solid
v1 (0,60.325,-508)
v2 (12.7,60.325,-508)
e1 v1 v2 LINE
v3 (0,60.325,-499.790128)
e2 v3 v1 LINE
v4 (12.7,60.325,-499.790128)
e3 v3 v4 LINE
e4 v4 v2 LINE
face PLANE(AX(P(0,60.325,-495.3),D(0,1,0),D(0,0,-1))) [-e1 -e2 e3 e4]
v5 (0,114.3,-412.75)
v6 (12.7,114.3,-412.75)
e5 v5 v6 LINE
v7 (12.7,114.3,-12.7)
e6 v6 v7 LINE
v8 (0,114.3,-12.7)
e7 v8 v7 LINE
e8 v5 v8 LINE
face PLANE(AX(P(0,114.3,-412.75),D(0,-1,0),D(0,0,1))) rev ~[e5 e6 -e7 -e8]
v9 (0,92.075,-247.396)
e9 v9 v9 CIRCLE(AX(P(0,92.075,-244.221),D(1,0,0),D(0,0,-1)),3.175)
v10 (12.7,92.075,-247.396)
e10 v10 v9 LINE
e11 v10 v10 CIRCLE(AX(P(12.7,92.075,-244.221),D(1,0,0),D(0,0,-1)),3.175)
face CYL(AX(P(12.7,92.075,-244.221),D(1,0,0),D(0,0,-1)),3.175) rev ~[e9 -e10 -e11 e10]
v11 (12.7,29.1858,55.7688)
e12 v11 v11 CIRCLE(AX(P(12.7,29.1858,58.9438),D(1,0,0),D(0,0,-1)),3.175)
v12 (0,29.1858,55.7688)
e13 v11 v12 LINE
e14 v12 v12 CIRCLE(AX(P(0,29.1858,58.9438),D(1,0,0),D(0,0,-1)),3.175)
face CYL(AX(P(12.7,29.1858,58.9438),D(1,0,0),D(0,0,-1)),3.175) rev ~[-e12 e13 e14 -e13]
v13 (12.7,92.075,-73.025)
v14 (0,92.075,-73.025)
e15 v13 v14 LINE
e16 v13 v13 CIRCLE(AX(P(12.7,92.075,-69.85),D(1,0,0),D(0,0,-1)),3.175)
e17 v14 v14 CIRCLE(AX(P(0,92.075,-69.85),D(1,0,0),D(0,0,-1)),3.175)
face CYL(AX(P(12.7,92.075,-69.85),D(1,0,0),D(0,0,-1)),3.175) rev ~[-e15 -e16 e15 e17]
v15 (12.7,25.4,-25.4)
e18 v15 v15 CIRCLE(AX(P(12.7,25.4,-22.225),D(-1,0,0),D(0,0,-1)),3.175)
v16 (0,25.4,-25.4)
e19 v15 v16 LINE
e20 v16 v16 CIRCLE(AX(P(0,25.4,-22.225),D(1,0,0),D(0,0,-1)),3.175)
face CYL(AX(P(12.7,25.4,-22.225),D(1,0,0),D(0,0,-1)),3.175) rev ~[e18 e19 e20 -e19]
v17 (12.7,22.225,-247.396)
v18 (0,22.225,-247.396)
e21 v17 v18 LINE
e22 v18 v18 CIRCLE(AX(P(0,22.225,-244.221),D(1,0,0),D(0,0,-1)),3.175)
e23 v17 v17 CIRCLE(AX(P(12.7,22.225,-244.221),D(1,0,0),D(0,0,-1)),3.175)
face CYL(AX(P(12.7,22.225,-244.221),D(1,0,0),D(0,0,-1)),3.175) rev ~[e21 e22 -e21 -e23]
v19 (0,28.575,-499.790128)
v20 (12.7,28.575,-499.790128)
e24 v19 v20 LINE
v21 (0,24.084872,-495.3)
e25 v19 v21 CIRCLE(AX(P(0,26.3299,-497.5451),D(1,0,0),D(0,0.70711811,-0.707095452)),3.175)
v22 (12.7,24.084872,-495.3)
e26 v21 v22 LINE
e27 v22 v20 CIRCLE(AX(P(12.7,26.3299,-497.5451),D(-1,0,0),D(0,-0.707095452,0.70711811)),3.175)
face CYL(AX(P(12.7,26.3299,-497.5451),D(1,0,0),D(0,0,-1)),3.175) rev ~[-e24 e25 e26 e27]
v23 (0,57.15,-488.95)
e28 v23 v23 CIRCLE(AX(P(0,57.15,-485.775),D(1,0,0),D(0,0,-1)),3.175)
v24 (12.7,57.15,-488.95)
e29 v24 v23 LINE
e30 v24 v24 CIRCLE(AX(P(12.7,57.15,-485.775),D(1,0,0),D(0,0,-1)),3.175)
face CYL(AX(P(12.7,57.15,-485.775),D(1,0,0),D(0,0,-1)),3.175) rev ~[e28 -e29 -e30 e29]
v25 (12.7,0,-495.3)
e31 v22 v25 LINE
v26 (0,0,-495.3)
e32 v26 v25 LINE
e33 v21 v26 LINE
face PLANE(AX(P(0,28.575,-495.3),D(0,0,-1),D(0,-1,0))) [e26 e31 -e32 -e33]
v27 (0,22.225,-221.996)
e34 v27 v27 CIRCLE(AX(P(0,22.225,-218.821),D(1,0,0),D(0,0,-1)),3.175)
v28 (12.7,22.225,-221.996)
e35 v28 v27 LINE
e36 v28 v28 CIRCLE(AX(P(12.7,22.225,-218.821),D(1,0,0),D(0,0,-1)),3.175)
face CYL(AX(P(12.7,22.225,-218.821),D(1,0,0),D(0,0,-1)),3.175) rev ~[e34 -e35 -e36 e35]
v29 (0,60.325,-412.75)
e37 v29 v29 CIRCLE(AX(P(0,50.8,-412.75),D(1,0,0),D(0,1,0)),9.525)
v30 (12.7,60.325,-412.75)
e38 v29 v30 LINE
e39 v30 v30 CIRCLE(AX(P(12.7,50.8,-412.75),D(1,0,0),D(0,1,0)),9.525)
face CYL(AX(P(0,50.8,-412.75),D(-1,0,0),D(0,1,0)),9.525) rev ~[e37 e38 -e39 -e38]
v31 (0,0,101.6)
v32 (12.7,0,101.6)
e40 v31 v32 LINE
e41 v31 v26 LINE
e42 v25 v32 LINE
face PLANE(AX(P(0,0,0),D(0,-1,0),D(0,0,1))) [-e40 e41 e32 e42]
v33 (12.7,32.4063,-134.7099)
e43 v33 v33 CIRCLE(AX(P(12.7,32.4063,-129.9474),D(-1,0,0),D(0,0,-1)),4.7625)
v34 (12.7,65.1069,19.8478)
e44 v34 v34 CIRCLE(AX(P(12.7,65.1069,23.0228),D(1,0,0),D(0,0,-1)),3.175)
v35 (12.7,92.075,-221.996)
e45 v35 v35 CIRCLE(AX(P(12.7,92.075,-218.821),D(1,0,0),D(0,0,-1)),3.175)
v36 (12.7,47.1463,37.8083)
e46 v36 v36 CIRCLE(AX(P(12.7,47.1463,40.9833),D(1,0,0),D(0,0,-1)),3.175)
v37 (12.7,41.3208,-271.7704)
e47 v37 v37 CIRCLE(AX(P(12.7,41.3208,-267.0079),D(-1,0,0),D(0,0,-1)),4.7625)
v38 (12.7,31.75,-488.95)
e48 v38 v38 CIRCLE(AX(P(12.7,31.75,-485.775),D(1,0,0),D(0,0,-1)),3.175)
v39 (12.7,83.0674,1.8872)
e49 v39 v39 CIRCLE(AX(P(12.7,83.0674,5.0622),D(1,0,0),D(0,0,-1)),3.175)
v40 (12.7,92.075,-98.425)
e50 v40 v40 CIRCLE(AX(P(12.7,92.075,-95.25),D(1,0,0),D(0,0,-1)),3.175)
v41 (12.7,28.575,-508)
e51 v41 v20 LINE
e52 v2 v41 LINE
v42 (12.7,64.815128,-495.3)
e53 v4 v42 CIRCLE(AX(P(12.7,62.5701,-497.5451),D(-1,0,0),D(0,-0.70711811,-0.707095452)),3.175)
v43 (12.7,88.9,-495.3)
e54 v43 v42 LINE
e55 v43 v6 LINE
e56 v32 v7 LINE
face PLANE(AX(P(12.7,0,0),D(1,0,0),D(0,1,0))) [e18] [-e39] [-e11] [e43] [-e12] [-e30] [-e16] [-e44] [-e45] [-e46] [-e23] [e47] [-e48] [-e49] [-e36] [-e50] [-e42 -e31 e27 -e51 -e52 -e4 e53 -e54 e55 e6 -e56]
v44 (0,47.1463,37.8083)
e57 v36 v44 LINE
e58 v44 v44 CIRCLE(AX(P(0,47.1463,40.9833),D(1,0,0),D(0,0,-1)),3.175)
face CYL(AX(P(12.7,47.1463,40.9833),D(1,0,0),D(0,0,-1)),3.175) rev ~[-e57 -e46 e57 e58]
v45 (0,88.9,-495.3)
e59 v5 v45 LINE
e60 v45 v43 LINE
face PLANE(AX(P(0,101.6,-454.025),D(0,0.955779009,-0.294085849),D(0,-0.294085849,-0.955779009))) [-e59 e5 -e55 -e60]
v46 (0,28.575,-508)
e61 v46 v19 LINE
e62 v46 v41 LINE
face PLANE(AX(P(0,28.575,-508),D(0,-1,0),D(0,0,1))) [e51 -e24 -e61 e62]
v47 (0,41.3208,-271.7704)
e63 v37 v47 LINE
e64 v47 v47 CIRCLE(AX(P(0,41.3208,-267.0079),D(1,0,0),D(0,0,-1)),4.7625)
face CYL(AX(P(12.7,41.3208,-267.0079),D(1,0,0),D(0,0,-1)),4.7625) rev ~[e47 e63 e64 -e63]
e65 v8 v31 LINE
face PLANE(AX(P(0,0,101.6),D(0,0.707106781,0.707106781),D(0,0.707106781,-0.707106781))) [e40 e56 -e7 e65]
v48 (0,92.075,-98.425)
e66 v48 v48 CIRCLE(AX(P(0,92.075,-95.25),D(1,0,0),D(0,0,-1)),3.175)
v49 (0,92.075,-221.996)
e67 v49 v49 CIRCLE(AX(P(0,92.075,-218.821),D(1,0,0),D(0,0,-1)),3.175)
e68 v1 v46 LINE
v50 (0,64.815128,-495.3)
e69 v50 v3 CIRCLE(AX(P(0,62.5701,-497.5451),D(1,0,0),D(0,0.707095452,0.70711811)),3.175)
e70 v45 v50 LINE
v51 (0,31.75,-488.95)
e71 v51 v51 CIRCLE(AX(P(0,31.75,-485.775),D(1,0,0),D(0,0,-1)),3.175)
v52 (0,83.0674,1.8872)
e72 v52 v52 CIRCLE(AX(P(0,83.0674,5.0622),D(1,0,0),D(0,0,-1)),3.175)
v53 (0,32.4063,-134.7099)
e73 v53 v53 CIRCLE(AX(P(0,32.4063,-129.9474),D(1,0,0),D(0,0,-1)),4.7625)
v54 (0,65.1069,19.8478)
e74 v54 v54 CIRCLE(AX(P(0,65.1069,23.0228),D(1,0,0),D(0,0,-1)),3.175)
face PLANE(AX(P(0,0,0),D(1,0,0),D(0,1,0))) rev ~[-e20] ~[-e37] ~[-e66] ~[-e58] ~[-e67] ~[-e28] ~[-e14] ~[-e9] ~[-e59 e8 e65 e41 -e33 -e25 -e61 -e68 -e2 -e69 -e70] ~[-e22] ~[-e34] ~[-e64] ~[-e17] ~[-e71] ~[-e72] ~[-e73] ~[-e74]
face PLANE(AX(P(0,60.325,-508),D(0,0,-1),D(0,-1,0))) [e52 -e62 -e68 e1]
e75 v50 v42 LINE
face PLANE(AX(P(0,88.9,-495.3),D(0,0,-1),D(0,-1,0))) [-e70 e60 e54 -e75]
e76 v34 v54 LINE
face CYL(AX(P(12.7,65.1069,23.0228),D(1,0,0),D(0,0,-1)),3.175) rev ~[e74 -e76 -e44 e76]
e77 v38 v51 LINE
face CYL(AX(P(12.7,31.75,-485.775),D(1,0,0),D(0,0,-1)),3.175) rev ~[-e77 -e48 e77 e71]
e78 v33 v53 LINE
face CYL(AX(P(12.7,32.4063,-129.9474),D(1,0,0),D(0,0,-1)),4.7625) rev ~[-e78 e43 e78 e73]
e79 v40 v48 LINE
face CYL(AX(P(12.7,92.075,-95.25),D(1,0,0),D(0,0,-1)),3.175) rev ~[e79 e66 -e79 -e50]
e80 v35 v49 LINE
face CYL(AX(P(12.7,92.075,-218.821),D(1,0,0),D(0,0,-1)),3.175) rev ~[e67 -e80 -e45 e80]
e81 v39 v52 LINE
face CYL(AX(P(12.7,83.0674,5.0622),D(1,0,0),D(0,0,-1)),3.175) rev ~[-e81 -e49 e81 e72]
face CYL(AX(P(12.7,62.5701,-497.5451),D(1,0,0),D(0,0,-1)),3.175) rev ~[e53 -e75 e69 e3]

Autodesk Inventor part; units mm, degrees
ref_plane "YZ Plane" through (0, 0, 0) normal (1, 0, 0) x (0, 1, 0)
ref_plane "XZ Plane" through (0, 0, 0) normal (0, 1, 0) x (-1, 0, 0)
ref_plane "XY Plane" through (0, 0, 0) normal (0, 0, 1) x (1, 0, 0)
sketch "Sketch1" plane through (0, 0, 0) normal (1, 0, 0) x (0, 1, 0)
  line L0 (0, 0) -> (101.6, 0)
  line L1 (101.6, 0) -> (101.6, -508)
  line L2 (101.6, -508) -> (0, -508)
  line L3 (0, -508) -> (0, 0)
  line L4 (0, 0) -> (0, 101.6)
  line L5 (0, 101.6) -> (101.6, 0)
  line L6 (101.6, -508) -> (114.3, -508)
  line L7 (114.3, -508) -> (114.3, -12.7)
  line L8 (114.3, -12.7) -> (101.6, -12.7)
  line L9 (101.6, -12.7) -> (101.6, -508)
  line L10 (114.3, -12.7) -> (101.6, 0)
  line L11 (0, -508) -> (28.575, -508)
  line L12 (28.575, -508) -> (28.575, -495.3)
  line L13 (28.575, -495.3) -> (0, -495.3)
  line L14 (0, -495.3) -> (0, -508)
  line L15 (60.325, -508) -> (114.3, -508)
  line L16 (114.3, -508) -> (114.3, -495.3)
  line L17 (114.3, -495.3) -> (60.325, -495.3)
  line L18 (60.325, -495.3) -> (60.325, -508)
  circle A0 centre (50.8, -412.75) radius 9.525
  line L19 (50.8, -412.75) -> (127.2366, -412.75)
  line L20 (114.3, -412.75) -> (88.9, -495.3)
  point P0 (0, -495.3)
  dimension "d0" = 508
  dimension "d1" = 101.6
  dimension "d2" = 101.6
  dimension "d3" = 12.7
  dimension "d4" = 495.3
  dimension "d5" = 28.575
  dimension "d6" = 12.7
  dimension "d7" = 31.75
  dimension "d8" = 19.05
  dimension "d9" = 95.25
  dimension "d10" = 50.8
  dimension "d11" = 28.575
  dimension "d14" = 12.7
extrude "Extrusion1" add sketch "Sketch1" along normal blind 12.7 contours L4 L5 L0 | L0 L1 L20 L17 L18 L2 L12 L13 L3 | L10 L8 L1 | L8 L7 L19 L1 | L19 L20 L1
sketch "Sketch2" plane through (12.7, 0, 0) normal (1, 0, 0) x (0, 0, -1)
  line L0 (508, 60.325) -> (495.3, 60.325) projected
  line L1 (495.3, 60.325) -> (497.5451, 62.5701)
  line L2 (495.3, 0) -> (495.3, 28.575) projected
  line L3 (495.3, 28.575) -> (497.5451, 26.3299)
  line L4 (495.3, 28.575) -> (508, 28.575) projected
  circle A0 centre (497.5451, 62.5701) radius 3.175
  circle A1 centre (497.5451, 26.3299) radius 3.175
  point P0 (0, 0)
  dimension "d15" = 3.175
  dimension "d16" = 45
  dimension "d17" = 3.175
  dimension "d18" = 45
  dimension "d19" = 6.35
  dimension "d20" = 6.35
extrude "Extrusion2" cut sketch "Sketch2" against normal blind 12.7
sketch "Sketch3" plane through (12.7, 0, 0) normal (1, 0, 0) x (0, 0, -1)
  circle A0 centre (485.775, 57.15) radius 3.175
  line L0 (495.3, 64.8151) -> (495.3, 88.9) projected
  line L1 (508, 28.575) -> (508, 60.325) projected
  circle A1 centre (485.775, 31.75) radius 3.175
  line L2 (495.3, 0) -> (495.3, 24.0849) projected
  line L3 (12.7, 114.3) -> (-101.6, 0) projected
  line L4 (-83.6395, 17.9605) -> (-29.758, 71.842)
  line L5 (-29.758, 71.842) -> (-16.2876, 58.3717)
  line L6 (-16.2876, 58.3717) -> (-70.1691, 4.4901)
  line L7 (-70.1691, 4.4901) -> (-83.6395, 17.9605)
  circle A2 centre (-58.9438, 29.1858) radius 3.175
  circle A3 centre (-40.9833, 47.1463) radius 3.175
  point P0 (0, 0)
  point P1 (508, 44.45)
  point P2 (508, 44.45)
  dimension "d23" = 6.35
  dimension "d25" = 9.525
  dimension "d27" = 12.7
  dimension "d28" = 6.35
  dimension "d29" = 9.525
  dimension "d30" = 12.7
  dimension "d31" = 19.05
  dimension "d32" = 76.2
  dimension "d33" = 25.4
  dimension "d34" = 6.35
  dimension "d35" = 6.35
  dimension "d36" = 9.525
  dimension "d37" = 9.525
  dimension "d38" = 25.4
  dimension "d39" = 25.4
extrude "Extrusion3" cut sketch "Sketch3" against normal blind 12.7 contours A0 | A1 | A2 | A3
sketch "Sketch4" plane through (12.7, 0, 0) normal (1, 0, 0) x (0, 0, -1)
  circle A0 centre (218.821, 92.075) radius 3.175
  line L0 (-101.6, 0) -> (495.3, 0) projected
  circle A1 centre (244.221, 92.075) radius 3.175
  point P0 (0, 0)
  dimension "d42" = 6.35
  dimension "d43" = 92.075
  dimension "d44" = 6.35
  dimension "d45" = 92.075
  dimension "d46" = 218.821
  dimension "d47" = 244.221
extrude "Extrusion4" cut sketch "Sketch4" against normal blind 12.7
sketch "Sketch6" plane through (12.7, 0, 0) normal (1, 0, 0) x (0, 0, -1)
  circle A0 centre (218.821, 22.225) radius 3.175
  circle A1 centre (244.221, 22.225) radius 3.175
  line L0 (-101.6, 0) -> (495.3, 0) projected
  point P0 (0, 0)
  dimension "d59" = 6.35
  dimension "d60" = 6.35
  dimension "d61" = 218.821
  dimension "d62" = 22.225
  dimension "d63" = 22.225
  dimension "d64" = 25.4
extrude "Extrusion6" cut sketch "Sketch6" against normal blind 12.7
sketch "Sketch7" plane through (12.7, 0, 0) normal (1, 0, 0) x (0, 0, -1)
  circle A0 centre (69.85, 92.075) radius 3.175
  circle A1 centre (95.25, 92.075) radius 3.175
  line L0 (412.75, 114.3) -> (12.7, 114.3) projected
  point P0 (0, 0)
  dimension "d67" = 6.35
  dimension "d68" = 6.35
  dimension "d69" = 69.85
  dimension "d70" = 22.225
  dimension "d71" = 22.225
  dimension "d72" = 25.4
extrude "Extrusion7" cut sketch "Sketch7" against normal blind 12.7
sketch "Sketch10" plane through (12.7, 0, 0) normal (1, 0, 0) x (0, 0, -1)
  circle A0 centre (22.225, 25.4) radius 3.175
  line L0 (-101.6, 0) -> (495.3, 0) projected
  circle A1 centre (412.75, 50.8) radius 9.525 projected
  circle A2 centre (412.75, 50.8) radius 76.2
  circle A3 centre (22.225, 25.4) radius 38.1
  line L1 (22.225, 25.4) -> (412.75, 50.8)
  circle A4 centre (129.9474, 32.4063) radius 4.7625
  circle A5 centre (267.0079, 41.3208) radius 4.7625
  point P0 (0, 0)
  dimension "d82" = 6.35
  dimension "d83" = 25.4
  dimension "d84" = 22.225
  dimension "d85" = 152.4
  dimension "d86" = 76.2
  dimension "d87" = 9.525
  dimension "d88" = 107.95
  dimension "d89" = 9.525
  dimension "d90" = 146.05
extrude "Extrusion8" cut sketch "Sketch10" against normal blind 12.7 contours A0 | A4 L1 | L1 A4 | A5 L1 | L1 A5
sketch "Sketch15" plane through (12.7, 0, 0) normal (1, 0, 0) x (0, 0, -1)
  circle A0 centre (-23.0228, 65.1069) radius 3.175
  line L0 (12.7, 114.3) -> (-101.6, 0) projected
  circle A1 centre (-40.9833, 47.1463) radius 3.175 projected
  circle A2 centre (-5.0622, 83.0674) radius 3.175
  line L1 (-74.6592, 26.9408) -> (-2.8172, 98.7828)
  line L2 (-2.8172, 98.7828) -> (10.6532, 85.3124)
  line L3 (10.6532, 85.3124) -> (-61.1888, 13.4704)
  line L4 (-61.1888, 13.4704) -> (-74.6592, 26.9408)
  circle A3 centre (-58.9438, 29.1858) radius 3.175 projected
  point P0 (0, 0)
  dimension "d103" = 6.35
  dimension "d104" = 9.525
  dimension "d105" = 25.4
  dimension "d106" = 6.35
  dimension "d107" = 9.525
  dimension "d108" = 25.4
  dimension "d109" = 19.05
  dimension "d110" = 12.7
  dimension "d111" = 101.6
extrude "Extrusion11" cut sketch "Sketch15" against normal blind 12.7 contours A0 | A2
properties part number "Side Wall_outer"
